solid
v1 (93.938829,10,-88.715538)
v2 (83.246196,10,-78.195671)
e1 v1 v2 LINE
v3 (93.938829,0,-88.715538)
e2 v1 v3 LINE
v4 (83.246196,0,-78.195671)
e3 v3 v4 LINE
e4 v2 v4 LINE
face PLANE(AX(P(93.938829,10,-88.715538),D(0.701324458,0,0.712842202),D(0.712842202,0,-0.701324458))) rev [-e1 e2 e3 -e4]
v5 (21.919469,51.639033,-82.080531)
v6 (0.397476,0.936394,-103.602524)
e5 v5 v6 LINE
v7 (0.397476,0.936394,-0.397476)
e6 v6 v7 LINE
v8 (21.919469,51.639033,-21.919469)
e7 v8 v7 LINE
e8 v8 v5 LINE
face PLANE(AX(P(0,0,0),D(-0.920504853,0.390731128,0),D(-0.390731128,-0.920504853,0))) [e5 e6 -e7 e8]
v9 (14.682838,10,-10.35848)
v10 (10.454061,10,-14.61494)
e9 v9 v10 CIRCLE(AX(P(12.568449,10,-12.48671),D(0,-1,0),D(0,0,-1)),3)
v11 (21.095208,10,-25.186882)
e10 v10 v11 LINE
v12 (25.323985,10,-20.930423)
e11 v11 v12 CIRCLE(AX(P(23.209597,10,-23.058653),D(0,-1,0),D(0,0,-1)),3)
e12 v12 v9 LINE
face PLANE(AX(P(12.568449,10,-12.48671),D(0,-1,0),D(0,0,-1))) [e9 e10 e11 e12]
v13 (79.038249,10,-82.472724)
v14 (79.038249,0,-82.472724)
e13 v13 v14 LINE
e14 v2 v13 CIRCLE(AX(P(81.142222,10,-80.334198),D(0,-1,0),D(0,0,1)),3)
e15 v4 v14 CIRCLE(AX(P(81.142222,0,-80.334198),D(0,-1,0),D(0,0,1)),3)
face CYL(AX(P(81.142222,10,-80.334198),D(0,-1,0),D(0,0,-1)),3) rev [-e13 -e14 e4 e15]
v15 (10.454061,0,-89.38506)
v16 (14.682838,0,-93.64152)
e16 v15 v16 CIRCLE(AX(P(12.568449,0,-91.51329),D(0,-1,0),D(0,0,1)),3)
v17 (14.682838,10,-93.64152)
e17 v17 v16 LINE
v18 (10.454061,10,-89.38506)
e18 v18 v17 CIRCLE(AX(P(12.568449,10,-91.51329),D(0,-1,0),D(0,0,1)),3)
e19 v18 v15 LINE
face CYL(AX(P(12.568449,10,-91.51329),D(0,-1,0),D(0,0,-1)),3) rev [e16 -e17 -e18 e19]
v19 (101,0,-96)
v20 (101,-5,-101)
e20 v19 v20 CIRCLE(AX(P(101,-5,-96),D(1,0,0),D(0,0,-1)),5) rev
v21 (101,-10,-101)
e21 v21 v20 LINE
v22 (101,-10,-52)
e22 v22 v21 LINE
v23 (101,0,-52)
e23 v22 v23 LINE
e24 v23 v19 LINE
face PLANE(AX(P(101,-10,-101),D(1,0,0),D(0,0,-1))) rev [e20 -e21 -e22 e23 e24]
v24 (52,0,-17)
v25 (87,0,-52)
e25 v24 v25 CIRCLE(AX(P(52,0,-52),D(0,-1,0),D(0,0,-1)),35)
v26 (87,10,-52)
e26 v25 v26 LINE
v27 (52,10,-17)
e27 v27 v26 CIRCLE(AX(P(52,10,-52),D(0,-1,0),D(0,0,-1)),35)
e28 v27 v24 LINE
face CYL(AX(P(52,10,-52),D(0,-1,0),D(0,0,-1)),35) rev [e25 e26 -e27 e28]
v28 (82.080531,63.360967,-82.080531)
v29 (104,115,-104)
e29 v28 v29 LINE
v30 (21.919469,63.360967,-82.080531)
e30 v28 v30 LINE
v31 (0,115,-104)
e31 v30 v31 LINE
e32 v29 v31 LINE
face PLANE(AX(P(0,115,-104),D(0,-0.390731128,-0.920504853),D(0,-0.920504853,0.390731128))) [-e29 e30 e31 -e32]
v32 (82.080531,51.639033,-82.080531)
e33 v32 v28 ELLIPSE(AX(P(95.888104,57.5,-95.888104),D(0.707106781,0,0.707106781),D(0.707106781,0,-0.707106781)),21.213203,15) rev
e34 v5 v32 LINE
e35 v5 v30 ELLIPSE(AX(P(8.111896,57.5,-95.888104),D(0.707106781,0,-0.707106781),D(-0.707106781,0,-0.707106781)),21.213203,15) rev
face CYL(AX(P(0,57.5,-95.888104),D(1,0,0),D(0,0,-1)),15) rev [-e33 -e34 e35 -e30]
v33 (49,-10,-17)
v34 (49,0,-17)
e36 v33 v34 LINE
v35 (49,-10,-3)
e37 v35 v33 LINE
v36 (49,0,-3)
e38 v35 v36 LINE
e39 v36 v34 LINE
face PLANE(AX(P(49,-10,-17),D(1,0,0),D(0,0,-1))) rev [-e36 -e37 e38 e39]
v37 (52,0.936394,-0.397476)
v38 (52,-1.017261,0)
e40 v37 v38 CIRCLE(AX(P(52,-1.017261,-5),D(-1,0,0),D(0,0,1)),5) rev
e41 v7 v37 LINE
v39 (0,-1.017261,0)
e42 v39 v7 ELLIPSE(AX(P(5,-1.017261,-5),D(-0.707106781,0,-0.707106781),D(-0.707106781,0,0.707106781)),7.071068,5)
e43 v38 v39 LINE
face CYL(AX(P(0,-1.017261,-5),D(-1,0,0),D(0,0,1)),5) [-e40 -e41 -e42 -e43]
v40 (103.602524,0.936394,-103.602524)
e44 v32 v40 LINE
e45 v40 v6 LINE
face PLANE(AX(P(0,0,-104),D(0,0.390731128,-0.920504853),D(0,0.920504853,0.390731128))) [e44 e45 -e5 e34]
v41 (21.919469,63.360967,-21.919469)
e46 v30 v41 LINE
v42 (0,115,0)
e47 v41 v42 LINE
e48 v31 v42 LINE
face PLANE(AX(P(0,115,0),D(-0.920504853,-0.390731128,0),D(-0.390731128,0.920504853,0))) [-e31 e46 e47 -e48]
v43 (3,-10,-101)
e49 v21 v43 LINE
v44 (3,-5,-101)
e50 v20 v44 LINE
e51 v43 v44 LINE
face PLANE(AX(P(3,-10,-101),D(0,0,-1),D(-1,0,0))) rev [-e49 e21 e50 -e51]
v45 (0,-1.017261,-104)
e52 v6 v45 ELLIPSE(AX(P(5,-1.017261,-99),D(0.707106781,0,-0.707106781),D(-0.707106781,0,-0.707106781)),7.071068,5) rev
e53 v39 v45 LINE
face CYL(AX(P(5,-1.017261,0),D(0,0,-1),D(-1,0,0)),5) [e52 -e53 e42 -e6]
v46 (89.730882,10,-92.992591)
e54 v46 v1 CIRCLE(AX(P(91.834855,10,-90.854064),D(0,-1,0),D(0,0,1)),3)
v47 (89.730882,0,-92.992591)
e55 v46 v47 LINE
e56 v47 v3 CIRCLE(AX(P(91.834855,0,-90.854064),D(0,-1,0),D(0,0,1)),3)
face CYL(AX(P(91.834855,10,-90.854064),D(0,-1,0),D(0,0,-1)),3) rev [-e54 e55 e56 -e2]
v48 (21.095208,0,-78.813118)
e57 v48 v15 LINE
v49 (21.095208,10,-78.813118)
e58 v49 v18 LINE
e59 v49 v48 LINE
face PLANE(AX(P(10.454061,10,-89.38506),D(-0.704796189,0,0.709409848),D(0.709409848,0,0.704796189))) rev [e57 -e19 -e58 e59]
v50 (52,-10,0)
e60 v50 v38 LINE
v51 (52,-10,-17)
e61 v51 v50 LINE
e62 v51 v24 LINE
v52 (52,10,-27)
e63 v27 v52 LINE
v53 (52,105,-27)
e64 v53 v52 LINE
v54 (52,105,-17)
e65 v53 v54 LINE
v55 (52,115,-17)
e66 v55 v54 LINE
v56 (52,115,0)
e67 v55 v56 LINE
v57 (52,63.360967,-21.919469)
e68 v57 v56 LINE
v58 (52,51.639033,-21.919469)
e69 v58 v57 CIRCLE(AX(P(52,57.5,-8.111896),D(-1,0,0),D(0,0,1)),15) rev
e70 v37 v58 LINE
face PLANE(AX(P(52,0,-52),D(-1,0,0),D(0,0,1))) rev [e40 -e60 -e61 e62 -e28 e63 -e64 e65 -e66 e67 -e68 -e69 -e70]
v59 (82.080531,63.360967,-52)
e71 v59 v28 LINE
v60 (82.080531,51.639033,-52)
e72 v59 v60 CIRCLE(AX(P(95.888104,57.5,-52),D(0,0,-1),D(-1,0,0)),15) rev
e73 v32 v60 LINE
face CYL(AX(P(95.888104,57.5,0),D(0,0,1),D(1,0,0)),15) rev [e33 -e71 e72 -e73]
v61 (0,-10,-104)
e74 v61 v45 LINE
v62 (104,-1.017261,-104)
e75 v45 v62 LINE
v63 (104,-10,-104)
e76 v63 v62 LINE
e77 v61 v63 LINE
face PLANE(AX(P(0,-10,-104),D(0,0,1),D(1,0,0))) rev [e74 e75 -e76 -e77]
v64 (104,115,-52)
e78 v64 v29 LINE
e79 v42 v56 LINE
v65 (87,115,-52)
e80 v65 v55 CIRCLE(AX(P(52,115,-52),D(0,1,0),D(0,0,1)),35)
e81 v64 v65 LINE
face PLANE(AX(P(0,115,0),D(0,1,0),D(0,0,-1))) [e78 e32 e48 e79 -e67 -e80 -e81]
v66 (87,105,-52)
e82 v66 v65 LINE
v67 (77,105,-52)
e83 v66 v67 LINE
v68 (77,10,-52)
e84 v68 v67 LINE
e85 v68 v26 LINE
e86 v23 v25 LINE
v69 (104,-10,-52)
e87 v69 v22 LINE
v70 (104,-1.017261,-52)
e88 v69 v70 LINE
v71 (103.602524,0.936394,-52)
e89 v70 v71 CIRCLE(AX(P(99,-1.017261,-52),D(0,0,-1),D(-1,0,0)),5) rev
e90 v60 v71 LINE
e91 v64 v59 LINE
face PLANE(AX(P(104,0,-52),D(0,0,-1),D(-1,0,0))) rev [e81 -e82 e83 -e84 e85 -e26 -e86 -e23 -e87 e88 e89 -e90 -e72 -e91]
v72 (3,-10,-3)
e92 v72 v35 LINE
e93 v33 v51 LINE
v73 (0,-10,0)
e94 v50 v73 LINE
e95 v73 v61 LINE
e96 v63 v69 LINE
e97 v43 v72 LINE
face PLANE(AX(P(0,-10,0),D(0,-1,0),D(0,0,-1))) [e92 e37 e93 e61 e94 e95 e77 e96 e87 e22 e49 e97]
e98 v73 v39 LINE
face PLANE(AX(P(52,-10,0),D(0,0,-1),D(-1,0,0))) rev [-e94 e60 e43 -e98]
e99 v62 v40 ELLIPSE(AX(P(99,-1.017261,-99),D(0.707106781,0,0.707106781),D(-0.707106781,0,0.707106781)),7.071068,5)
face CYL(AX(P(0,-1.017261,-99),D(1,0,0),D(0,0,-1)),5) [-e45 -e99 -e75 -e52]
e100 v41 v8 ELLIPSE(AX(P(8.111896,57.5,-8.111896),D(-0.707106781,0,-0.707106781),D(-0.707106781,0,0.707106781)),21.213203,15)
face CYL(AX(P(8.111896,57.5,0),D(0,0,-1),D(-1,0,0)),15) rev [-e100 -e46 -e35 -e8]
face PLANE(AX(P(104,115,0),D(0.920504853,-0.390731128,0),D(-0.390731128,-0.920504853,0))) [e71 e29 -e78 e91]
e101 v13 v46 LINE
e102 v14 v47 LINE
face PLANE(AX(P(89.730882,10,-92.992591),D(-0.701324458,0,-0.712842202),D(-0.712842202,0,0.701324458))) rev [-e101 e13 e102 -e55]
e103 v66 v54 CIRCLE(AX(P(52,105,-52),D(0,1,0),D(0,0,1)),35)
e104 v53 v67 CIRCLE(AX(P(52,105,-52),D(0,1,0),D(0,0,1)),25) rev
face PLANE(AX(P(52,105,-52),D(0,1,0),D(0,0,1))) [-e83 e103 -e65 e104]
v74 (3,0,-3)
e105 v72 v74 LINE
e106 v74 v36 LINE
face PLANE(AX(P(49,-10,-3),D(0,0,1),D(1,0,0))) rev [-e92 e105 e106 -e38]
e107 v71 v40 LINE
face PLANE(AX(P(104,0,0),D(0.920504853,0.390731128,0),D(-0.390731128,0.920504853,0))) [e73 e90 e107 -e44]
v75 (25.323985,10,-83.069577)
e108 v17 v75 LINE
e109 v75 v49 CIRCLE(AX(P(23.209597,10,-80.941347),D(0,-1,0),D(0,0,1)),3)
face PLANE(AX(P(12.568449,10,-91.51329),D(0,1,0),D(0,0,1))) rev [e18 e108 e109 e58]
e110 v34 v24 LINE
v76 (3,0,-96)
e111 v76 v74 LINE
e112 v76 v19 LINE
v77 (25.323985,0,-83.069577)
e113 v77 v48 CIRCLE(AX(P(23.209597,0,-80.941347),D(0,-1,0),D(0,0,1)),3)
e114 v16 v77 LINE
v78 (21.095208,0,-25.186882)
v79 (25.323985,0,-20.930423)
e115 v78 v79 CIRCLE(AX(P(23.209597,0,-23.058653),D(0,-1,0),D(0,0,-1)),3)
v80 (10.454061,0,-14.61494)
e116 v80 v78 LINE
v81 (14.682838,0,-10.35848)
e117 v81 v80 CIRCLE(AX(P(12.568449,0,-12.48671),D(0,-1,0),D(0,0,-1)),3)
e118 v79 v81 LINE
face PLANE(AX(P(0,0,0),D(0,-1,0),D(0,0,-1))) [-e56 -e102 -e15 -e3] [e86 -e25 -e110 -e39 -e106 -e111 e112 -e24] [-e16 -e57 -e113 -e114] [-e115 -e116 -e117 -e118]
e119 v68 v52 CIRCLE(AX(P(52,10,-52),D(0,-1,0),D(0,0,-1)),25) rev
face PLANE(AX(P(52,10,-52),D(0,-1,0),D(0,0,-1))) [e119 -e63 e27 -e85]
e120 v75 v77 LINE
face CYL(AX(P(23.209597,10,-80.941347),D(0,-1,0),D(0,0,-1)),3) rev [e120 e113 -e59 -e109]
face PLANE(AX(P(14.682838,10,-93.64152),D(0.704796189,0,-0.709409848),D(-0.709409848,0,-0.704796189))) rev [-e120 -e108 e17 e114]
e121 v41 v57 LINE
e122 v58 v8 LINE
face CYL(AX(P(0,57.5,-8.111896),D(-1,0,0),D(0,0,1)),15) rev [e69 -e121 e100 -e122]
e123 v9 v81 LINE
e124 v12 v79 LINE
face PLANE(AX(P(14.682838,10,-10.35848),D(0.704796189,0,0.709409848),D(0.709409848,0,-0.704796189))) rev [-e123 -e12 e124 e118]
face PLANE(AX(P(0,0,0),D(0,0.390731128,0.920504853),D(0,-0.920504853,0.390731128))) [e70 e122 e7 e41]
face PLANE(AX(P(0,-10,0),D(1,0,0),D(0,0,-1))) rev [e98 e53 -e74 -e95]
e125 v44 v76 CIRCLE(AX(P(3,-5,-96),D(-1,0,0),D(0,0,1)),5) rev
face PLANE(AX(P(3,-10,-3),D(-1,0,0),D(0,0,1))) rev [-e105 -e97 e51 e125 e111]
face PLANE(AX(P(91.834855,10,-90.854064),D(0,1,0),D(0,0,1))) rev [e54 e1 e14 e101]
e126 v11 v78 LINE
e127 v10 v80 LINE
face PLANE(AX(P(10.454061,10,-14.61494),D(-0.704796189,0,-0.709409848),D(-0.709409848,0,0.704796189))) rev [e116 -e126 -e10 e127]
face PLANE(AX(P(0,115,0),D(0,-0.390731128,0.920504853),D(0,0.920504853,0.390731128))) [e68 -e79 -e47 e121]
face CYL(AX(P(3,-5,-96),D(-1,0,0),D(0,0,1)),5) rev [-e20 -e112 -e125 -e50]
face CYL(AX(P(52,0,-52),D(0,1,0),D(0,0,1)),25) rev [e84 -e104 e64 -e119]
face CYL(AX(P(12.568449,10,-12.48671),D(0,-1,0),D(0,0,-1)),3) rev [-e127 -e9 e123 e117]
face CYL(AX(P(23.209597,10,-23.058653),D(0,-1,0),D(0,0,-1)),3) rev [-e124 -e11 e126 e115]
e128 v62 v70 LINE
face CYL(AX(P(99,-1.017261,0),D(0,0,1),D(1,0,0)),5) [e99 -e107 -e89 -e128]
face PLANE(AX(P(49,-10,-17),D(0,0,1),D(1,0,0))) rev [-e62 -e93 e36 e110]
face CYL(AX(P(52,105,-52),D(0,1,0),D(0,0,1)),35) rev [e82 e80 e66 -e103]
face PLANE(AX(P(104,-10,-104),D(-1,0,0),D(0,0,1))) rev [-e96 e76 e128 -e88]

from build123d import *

# Parameters (mm, degrees)
SKETCH1_W           = 104
SKETCH1_H           = 104
BOSS_EXTRUDE1_DEPTH = 57.5
BOSS_EXTRUDE1_TAPER = 23
SKETCH2_R           = 25
CUT_EXTRUDE1_DEPTH  = 187.700294763
FILLET1_R           = 15
SKETCH3_R           = 35
CUT_EXTRUDE2_DEPTH  = 10
CUT_EXTRUDE3_START  = -10
SKETCH4_R           = 35
CUT_EXTRUDE3_DEPTH  = 10
SKETCH5_W           = 52
SKETCH5_H           = 52
CUT_EXTRUDE4_DEPTH  = 187.700294763
BOSS_EXTRUDE2_DEPTH = 10
FILLET2_R           = 5
FILLET3_R           = 5
CUT_EXTRUDE5_DEPTH  = 10


with BuildPart() as part:
    # Sketch1 → Boss-Extrude1 (new body)
    with BuildSketch(Plane(origin=(0, 0, 0), x_dir=(1, 0, 0), z_dir=(0, 1, 0))):
        with Locations((52, 52)):
            Rectangle(SKETCH1_W, SKETCH1_H)
    extrude(amount=BOSS_EXTRUDE1_DEPTH, taper=BOSS_EXTRUDE1_TAPER)

    # Mirror1: part across plane


with BuildPart() as part_1:
    add(part.part)
    add(part.part.mirror(Plane(origin=(0, 57.5, 0), x_dir=(0, 0, 1), z_dir=(0, -1, 0))))

    # Sketch2 → Cut-Extrude1 (cut, through all)
    with BuildSketch(Plane(origin=(0, 115, 0), x_dir=(1, 0, 0), z_dir=(0, 1, 0))):
        with Locations(Location((52, 52, 0), (0, 0, 270))):
            Circle(SKETCH2_R)
    extrude(amount=-CUT_EXTRUDE1_DEPTH, mode=Mode.SUBTRACT)

    # Fillet1
    # the kernel refuses this fillet: 15 mm, written as the material it adds along each edge
    with BuildSketch(Plane(origin=(24.407301932, 57.5, -95.510503676), x_dir=(-0.39073112848927455, -0.9205048534524399, 0), z_dir=(0, 0, 1))) as fillet1_piece_1_section:
        with BuildLine():
            CenterArc((FILLET1_R * 0.42447481621, -FILLET1_R), FILLET1_R, 90, 46)
            Line((-FILLET1_R * 0.294864984129, -FILLET1_R * 0.305341629541), (0, 0))
            Line((0, 0), (FILLET1_R * 0.42447481621, 0))
        make_face()
    fillet1_piece_1 = extrude(amount=87.021007352, mode=Mode.PRIVATE)
    fillet1_piece_1 = fillet1_piece_1 - Plane(origin=(24.407301932, 57.5, -8.111896271), x_dir=(0, -0.39073112848927466, -0.9205048534524399), z_dir=(-1, 0, 0)) * Cylinder(15, 200, mode=Mode.PRIVATE)
    fillet1_piece_1 = fillet1_piece_1 - Plane(origin=(24.407301932, 57.5, -95.888103729), x_dir=(0, -0.3907311284892748, 0.9205048534524398), z_dir=(1, 0, 0)) * Cylinder(15, 200, mode=Mode.PRIVATE)
    add(fillet1_piece_1)
    with BuildSketch(Plane(origin=(8.489496324, 57.5, -24.407301932), x_dir=(0, -0.9205048534524399, 0.39073112848927455), z_dir=(1, 0, 0))) as fillet1_piece_2_section:
        with BuildLine():
            CenterArc((FILLET1_R * 0.42447481621, -FILLET1_R), FILLET1_R, 90, 46)
            Line((-FILLET1_R * 0.294864984129, -FILLET1_R * 0.305341629541), (0, 0))
            Line((0, 0), (FILLET1_R * 0.42447481621, 0))
        make_face()
    fillet1_piece_2 = extrude(amount=87.021007352, mode=Mode.PRIVATE)
    fillet1_piece_2 = fillet1_piece_2 - Plane(origin=(95.888103729, 57.5, -24.407301932), x_dir=(-0.9205048534524398, -0.3907311284892748, 0), z_dir=(0, 0, 1)) * Cylinder(15, 200, mode=Mode.PRIVATE)
    fillet1_piece_2 = fillet1_piece_2 - Plane(origin=(8.111896271, 57.5, -24.407301932), x_dir=(0.9205048534524399, -0.39073112848927466, 0), z_dir=(0, 0, -1)) * Cylinder(15, 200, mode=Mode.PRIVATE)
    add(fillet1_piece_2)
    with BuildSketch(Plane(origin=(79.592698068, 57.5, -8.489496324), x_dir=(0.39073112848927455, -0.9205048534524399, 0), z_dir=(0, 0, -1))) as fillet1_piece_3_section:
        with BuildLine():
            CenterArc((FILLET1_R * 0.42447481621, -FILLET1_R), FILLET1_R, 90, 46)
            Line((-FILLET1_R * 0.294864984129, -FILLET1_R * 0.305341629541), (0, 0))
            Line((0, 0), (FILLET1_R * 0.42447481621, 0))
        make_face()
    fillet1_piece_3 = extrude(amount=87.021007352, mode=Mode.PRIVATE)
    fillet1_piece_3 = fillet1_piece_3 - Plane(origin=(79.592698068, 57.5, -8.111896271), x_dir=(0, -0.39073112848927466, -0.9205048534524399), z_dir=(-1, 0, 0)) * Cylinder(15, 200, mode=Mode.PRIVATE)
    fillet1_piece_3 = fillet1_piece_3 - Plane(origin=(79.592698068, 57.5, -95.888103729), x_dir=(0, -0.3907311284892748, 0.9205048534524398), z_dir=(1, 0, 0)) * Cylinder(15, 200, mode=Mode.PRIVATE)
    add(fillet1_piece_3)
    with BuildSketch(Plane(origin=(95.510503676, 57.5, -79.592698068), x_dir=(0, -0.9205048534524399, -0.39073112848927455), z_dir=(-1, 0, 0))) as fillet1_piece_4_section:
        with BuildLine():
            CenterArc((FILLET1_R * 0.42447481621, -FILLET1_R), FILLET1_R, 90, 46)
            Line((-FILLET1_R * 0.294864984129, -FILLET1_R * 0.305341629541), (0, 0))
            Line((0, 0), (FILLET1_R * 0.42447481621, 0))
        make_face()
    fillet1_piece_4 = extrude(amount=87.021007352, mode=Mode.PRIVATE)
    fillet1_piece_4 = fillet1_piece_4 - Plane(origin=(95.888103729, 57.5, -79.592698068), x_dir=(-0.9205048534524398, -0.3907311284892748, 0), z_dir=(0, 0, 1)) * Cylinder(15, 200, mode=Mode.PRIVATE)
    fillet1_piece_4 = fillet1_piece_4 - Plane(origin=(8.111896271, 57.5, -79.592698068), x_dir=(0.9205048534524399, -0.39073112848927466, 0), z_dir=(0, 0, -1)) * Cylinder(15, 200, mode=Mode.PRIVATE)
    add(fillet1_piece_4)

    # Sketch3 → Cut-Extrude2 (cut)
    with BuildSketch(Plane(origin=(0, 115, 0), x_dir=(1, 0, 0), z_dir=(0, 1, 0))):
        with Locations(Location((52, 52, 0), (0, 0, 270))):
            Circle(SKETCH3_R)
    extrude(amount=-CUT_EXTRUDE2_DEPTH, mode=Mode.SUBTRACT)

    # Sketch4 → Cut-Extrude3 (cut)
    with BuildSketch(Plane.XZ.offset(CUT_EXTRUDE3_START)):
        with Locations(Location((52, -52, 0), (0, 0, 90))):
            Circle(SKETCH4_R)
    extrude(amount=CUT_EXTRUDE3_DEPTH, mode=Mode.SUBTRACT)

    # Sketch5 → Cut-Extrude4 (cut, through all)
    with BuildSketch(Plane(origin=(0, 115, 0), x_dir=(1, 0, 0), z_dir=(0, 1, 0))):
        with Locations((78, 26)):
            Rectangle(SKETCH5_W, SKETCH5_H)
    extrude(amount=-CUT_EXTRUDE4_DEPTH, mode=Mode.SUBTRACT)

    # Sketch7 → Boss-Extrude2 (add)
    with BuildSketch(Plane.XZ):
        Polygon((49, -17), (49, -3), (3, -3), (3, -101), (101, -101), (101, -52), (104, -52), (104, -104), (0, -104), (0, 0), (52, 0), (52, -17), align=None)
    extrude(amount=BOSS_EXTRUDE2_DEPTH)

    # Fillet2
    fillet2_edges = [part_1.edges().sort_by_distance(p)[0] for p in [
        (52, 0, -101),
        (26, 0, 0),
        (0, 0, -52),
        (104, 0, -78),
    ]]
    fillet(fillet2_edges, radius=FILLET2_R)

    # Fillet3
    fillet3_edges = [part_1.edges().sort_by_distance(p)[0] for p in [
        (52, 0, -104),
    ]]
    fillet(fillet3_edges, radius=FILLET3_R)

    # Sketch8 → Cut-Extrude5 (cut)
    with BuildSketch(Plane.XZ):
        with BuildLine():
            Line((14.682837651, -10.358480419), (25.323985369, -20.930423251))
            ThreePointArc((25.323985369, -20.930423251), (25.337826346, -25.173041361), (21.095208236, -25.186882338))
            Line((21.095208236, -25.186882338), (10.454060518, -14.614939506))
            ThreePointArc((10.454060518, -14.614939506), (10.440219541, -10.372321396), (14.682837651, -10.358480419))
        make_face()
        with BuildLine():
            Line((14.682837651, -93.641519581), (25.323985369, -83.069576749))
            ThreePointArc((25.323985369, -83.069576749), (25.337826346, -78.826958639), (21.095208236, -78.813117662))
            Line((21.095208236, -78.813117662), (10.454060518, -89.385060494))
            ThreePointArc((10.454060518, -89.385060494), (10.440219541, -93.627678604), (14.682837651, -93.641519581))
        make_face()
        with BuildLine():
            Line((93.938828765, -88.715537796), (83.246195736, -78.19567093))
            ThreePointArc((83.246195736, -78.19567093), (79.003695757, -78.230224162), (79.038248989, -82.472724142))
            Line((79.038248989, -82.472724142), (89.730882019, -92.992591008))
            ThreePointArc((89.730882019, -92.992591008), (93.973381998, -92.958037776), (93.938828765, -88.715537796))
        make_face()
    extrude(amount=-CUT_EXTRUDE5_DEPTH, mode=Mode.SUBTRACT)


solid = part_1.part
